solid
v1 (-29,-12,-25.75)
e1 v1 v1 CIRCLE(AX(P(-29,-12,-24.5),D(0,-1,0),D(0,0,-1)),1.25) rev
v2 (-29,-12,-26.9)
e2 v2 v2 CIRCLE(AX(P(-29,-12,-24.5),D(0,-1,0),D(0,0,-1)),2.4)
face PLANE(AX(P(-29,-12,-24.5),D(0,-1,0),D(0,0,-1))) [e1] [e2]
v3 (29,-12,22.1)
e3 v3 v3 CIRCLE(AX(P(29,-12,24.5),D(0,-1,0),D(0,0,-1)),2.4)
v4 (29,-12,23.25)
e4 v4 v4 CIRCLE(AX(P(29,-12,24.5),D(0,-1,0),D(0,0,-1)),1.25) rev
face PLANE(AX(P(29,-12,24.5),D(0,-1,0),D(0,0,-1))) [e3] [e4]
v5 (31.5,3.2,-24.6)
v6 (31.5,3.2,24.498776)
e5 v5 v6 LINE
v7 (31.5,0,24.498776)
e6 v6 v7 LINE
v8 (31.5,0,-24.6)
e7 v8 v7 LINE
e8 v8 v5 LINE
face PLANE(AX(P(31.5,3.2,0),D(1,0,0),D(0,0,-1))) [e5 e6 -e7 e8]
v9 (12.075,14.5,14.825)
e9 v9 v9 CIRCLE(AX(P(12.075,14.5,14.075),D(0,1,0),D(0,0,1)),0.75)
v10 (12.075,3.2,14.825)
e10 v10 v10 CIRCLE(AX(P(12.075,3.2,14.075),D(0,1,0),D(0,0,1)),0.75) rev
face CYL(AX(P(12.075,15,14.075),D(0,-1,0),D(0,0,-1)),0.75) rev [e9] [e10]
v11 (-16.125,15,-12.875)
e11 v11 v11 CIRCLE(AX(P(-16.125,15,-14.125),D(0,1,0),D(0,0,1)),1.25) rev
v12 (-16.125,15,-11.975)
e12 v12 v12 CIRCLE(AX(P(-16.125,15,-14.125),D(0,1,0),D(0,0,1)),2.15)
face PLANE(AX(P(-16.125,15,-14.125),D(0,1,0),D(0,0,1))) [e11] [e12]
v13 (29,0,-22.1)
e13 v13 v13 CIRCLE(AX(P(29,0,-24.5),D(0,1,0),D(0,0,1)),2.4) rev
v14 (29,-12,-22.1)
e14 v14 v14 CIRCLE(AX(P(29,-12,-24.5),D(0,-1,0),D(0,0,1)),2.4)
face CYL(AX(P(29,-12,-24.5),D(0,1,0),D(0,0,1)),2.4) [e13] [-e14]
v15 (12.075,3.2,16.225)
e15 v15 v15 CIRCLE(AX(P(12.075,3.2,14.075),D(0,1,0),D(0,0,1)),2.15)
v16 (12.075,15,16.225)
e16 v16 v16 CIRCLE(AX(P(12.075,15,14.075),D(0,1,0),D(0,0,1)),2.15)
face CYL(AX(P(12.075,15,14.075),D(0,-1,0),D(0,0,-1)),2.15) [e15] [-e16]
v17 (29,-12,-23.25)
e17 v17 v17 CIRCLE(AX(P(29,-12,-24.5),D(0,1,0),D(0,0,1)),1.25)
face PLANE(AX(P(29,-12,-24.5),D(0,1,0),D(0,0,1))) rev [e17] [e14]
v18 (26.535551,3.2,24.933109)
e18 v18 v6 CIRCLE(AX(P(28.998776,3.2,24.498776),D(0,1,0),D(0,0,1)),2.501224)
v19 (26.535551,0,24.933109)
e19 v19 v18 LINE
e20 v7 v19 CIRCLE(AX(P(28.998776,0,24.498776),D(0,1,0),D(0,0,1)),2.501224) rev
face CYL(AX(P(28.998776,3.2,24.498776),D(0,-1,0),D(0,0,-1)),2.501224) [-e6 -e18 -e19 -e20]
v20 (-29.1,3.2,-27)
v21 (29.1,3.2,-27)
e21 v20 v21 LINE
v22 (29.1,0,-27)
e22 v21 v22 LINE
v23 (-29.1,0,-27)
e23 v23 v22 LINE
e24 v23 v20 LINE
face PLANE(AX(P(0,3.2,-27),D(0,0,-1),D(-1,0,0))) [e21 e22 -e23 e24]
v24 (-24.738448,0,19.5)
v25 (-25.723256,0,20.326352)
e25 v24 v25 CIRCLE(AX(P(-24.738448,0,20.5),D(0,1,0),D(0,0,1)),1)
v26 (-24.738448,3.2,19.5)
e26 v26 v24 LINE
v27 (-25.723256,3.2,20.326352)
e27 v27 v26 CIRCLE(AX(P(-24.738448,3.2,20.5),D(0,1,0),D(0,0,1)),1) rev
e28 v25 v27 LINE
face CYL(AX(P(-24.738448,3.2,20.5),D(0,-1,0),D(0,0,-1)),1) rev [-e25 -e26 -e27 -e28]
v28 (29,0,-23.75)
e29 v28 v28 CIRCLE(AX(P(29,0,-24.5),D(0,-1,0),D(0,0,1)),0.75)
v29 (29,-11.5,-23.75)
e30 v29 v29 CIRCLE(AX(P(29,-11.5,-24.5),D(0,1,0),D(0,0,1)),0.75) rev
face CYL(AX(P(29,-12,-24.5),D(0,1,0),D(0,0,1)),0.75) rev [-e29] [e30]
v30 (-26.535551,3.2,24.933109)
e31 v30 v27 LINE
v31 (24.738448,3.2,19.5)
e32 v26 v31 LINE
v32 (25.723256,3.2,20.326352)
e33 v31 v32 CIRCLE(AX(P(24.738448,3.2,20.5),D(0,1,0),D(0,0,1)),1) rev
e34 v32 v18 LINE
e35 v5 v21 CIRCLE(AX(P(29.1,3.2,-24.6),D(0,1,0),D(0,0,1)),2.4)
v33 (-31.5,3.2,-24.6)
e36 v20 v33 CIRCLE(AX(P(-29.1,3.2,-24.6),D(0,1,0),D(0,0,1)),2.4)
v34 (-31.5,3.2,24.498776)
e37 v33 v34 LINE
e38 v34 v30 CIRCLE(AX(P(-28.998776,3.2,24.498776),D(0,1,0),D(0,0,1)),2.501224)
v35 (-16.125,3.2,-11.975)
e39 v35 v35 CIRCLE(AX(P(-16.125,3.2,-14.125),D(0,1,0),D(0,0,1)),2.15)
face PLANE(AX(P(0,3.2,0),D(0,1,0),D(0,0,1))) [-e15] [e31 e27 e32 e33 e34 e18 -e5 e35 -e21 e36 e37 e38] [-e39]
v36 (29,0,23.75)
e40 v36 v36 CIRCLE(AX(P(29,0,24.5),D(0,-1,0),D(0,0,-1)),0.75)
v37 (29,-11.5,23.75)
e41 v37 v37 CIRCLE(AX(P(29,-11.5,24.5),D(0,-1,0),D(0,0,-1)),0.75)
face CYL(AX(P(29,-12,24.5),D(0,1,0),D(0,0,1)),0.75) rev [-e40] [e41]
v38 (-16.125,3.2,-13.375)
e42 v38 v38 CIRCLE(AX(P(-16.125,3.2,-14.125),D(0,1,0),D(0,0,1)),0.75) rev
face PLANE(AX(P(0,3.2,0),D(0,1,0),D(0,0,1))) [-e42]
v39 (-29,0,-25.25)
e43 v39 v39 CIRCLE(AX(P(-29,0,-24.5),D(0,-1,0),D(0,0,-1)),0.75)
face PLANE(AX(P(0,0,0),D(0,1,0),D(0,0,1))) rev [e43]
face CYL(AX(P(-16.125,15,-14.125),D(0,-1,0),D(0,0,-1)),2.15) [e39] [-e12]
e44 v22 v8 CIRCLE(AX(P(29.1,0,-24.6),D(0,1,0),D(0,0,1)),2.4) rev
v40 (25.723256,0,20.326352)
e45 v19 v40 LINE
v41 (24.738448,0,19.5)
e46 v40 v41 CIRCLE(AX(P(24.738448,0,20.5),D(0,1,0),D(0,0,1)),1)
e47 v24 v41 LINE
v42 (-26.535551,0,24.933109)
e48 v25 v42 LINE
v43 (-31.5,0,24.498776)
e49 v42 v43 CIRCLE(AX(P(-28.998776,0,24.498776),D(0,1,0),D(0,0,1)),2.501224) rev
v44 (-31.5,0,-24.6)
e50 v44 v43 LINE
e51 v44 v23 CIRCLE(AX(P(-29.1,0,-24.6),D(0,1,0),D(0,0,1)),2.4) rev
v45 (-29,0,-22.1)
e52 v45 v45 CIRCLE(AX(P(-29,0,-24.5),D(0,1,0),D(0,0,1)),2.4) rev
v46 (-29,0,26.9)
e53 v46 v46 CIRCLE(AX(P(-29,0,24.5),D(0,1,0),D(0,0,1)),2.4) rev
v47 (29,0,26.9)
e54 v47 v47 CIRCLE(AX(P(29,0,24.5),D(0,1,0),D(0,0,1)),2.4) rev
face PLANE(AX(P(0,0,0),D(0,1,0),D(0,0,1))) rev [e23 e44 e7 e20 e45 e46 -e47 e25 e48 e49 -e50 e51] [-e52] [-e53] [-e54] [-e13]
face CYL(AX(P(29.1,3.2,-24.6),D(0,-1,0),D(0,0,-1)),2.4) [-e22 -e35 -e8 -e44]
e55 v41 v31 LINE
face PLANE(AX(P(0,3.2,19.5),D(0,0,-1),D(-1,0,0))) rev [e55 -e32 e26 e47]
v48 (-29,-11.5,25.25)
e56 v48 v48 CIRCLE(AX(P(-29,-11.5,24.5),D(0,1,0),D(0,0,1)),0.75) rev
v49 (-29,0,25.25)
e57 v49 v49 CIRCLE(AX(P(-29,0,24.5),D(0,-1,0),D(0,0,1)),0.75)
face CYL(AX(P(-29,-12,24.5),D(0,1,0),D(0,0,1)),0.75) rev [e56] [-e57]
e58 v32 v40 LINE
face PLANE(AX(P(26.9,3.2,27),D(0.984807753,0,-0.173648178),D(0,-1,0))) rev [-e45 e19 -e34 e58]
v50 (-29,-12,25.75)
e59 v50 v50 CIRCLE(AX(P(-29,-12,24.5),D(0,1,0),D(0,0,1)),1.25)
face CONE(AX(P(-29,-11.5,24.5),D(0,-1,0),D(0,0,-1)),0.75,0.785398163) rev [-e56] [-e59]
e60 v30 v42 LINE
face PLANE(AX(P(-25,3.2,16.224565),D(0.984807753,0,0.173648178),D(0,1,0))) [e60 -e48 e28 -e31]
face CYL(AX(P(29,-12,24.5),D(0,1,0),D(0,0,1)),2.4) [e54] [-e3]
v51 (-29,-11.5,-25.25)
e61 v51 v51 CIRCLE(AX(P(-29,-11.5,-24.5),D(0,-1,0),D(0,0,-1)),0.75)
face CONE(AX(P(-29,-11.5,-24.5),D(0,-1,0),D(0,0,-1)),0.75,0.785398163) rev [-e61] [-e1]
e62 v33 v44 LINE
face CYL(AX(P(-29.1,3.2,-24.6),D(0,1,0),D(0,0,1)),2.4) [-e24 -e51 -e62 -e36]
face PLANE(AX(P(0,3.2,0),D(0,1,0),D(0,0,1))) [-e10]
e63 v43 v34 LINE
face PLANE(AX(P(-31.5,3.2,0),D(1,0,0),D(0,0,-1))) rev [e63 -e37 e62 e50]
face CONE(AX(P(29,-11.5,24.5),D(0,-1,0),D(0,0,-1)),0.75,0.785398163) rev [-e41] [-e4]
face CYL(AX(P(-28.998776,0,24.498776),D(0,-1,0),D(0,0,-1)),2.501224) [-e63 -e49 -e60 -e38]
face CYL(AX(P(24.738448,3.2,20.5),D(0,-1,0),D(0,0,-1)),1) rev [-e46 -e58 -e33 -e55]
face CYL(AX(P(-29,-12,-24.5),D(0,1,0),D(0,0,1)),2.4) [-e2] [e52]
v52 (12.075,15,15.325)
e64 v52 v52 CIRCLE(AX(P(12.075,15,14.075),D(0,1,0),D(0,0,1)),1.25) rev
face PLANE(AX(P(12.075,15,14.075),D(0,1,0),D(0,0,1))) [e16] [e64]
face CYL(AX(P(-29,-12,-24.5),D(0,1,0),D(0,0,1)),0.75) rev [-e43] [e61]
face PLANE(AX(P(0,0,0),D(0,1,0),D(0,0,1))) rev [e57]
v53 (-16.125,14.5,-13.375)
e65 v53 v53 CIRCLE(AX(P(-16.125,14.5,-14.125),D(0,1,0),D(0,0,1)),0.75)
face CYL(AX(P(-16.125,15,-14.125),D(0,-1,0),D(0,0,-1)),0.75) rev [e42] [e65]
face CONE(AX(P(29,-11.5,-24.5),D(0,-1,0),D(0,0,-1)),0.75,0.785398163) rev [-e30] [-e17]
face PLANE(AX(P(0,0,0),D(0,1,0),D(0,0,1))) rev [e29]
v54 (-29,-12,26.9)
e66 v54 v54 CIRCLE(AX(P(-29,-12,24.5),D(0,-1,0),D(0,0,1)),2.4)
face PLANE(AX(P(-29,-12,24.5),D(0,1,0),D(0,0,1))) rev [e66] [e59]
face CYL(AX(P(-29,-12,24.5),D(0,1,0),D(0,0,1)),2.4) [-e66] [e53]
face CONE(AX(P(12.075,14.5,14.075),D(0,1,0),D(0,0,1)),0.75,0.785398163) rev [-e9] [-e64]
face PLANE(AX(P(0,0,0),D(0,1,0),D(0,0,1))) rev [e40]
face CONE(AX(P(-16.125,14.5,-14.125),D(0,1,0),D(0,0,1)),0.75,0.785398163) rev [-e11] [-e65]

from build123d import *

# Parameters (mm, degrees)
BOSS_EXTRUDE1_DEPTH = 3.2
SKETCH2_R           = 2.4
SKETCH2_R_2         = 0.75
BOSS_EXTRUDE2_DEPTH = 12
SKETCH3_R           = 2.15
SKETCH3_R_2         = 0.75
BOSS_EXTRUDE3_DEPTH = 11.8
CHAMFER1_SIZE       = 0.5
CHAMFER2_SIZE       = 1.9
CHAMFER2_SIZE_2     = 10.775435457
FILLET1_R           = 2.4
FILLET2_R           = 2.501224
FILLET3_R           = 2.501224
FILLET4_R           = 1


# Some blends are built 0.0001 mm under size
with BuildPart() as part:
    # Sketch1 → Boss-Extrude1 (new body)
    with BuildSketch(Plane(origin=(0, 0, 0), x_dir=(1, 0, 0), z_dir=(0, 1, 0))):
        Polygon((31.5, 27), (-31.5, 27), (-31.5, -27), (-25, -27), (-25, -19.5), (25, -19.5), (25, -27), (31.5, -27), align=None)
    extrude(amount=BOSS_EXTRUDE1_DEPTH)

    # Sketch2 → Boss-Extrude2 (add)
    # profile 1 of 4: a face of its own
    with BuildSketch(Plane.XZ):
        with Locations(Location((-29, -24.5, 0), (0, 0, 90))):
            Circle(SKETCH2_R)
        with Locations(Location((-29, -24.5, 0), (0, 0, 270))):
            Circle(SKETCH2_R_2, mode=Mode.SUBTRACT)
    # profile 2 of 4: a face of its own
    with BuildSketch(Plane.XZ):
        with Locations(Location((29, -24.5, 0), (0, 0, 90))):
            Circle(SKETCH2_R)
        with Locations(Location((29, -24.5, 0), (0, 0, 90))):
            Circle(SKETCH2_R_2, mode=Mode.SUBTRACT)
    # profile 3 of 4: a face of its own
    with BuildSketch(Plane.XZ):
        with Locations(Location((29, 24.5, 0), (0, 0, 90))):
            Circle(SKETCH2_R)
        with Locations(Location((29, 24.5, 0), (0, 0, 270))):
            Circle(SKETCH2_R_2, mode=Mode.SUBTRACT)
    # profile 4 of 4: a face of its own
    with BuildSketch(Plane.XZ):
        with Locations(Location((-29, 24.5, 0), (0, 0, 90))):
            Circle(SKETCH2_R)
        with Locations(Location((-29, 24.5, 0), (0, 0, 90))):
            Circle(SKETCH2_R_2, mode=Mode.SUBTRACT)
    extrude(amount=BOSS_EXTRUDE2_DEPTH)

    # Sketch3 → Boss-Extrude3 (add)
    # profile 1 of 2: a face of its own
    with BuildSketch(Plane(origin=(0, 3.2, 0), x_dir=(1, 0, 0), z_dir=(0, 1, 0))):
        with Locations(Location((-16.125, 14.125, 0), (0, 0, 270))):
            Circle(SKETCH3_R)
        with Locations(Location((-16.125, 14.125, 0), (0, 0, 270))):
            Circle(SKETCH3_R_2, mode=Mode.SUBTRACT)
    # profile 2 of 2: a face of its own
    with BuildSketch(Plane(origin=(0, 3.2, 0), x_dir=(1, 0, 0), z_dir=(0, 1, 0))):
        with Locations(Location((12.075, -14.075, 0), (0, 0, 270))):
            Circle(SKETCH3_R)
        with Locations(Location((12.075, -14.075, 0), (0, 0, 270))):
            Circle(SKETCH3_R_2, mode=Mode.SUBTRACT)
    extrude(amount=BOSS_EXTRUDE3_DEPTH)

    # Chamfer1
    chamfer1_edges = [part.edges().sort_by_distance(p)[0] for p in [
        (-29, -12, -23.75),
        (29, -12, -25.25),
        (29, -12, 25.25),
        (-29, -12, 23.75),
        (-16.125, 15, -14.875),
        (12.075, 15, 13.325),
    ]]
    chamfer(chamfer1_edges, length=CHAMFER1_SIZE)

    # Chamfer2
    # the kernel refuses this chamfer: 10.775435457, 1.9 mm, written as the material it takes off along each edge
    with BuildSketch(Plane(origin=(25, -28.000387084, 27), x_dir=(0.9776715712462577, 0, 0.2101387607674357), z_dir=(0, 1, 0))) as chamfer2_piece_1_section:
        Polygon((CHAMFER2_SIZE * 0.977671571246, CHAMFER2_SIZE * 0.210138760767), (-CHAMFER2_SIZE_2 * 0.210138760773, CHAMFER2_SIZE_2 * 0.977671571271), (0, 0), align=None)
    chamfer2_piece_1 = extrude(amount=59.200774168, mode=Mode.PRIVATE)
    chamfer2_piece_1 = split(chamfer2_piece_1, bisect_by=Plane(origin=(25.592384699, 1.6, 19.5), z_dir=(0, 0, 1)), keep=Keep.TOP, mode=Mode.PRIVATE)
    add(chamfer2_piece_1, mode=Mode.SUBTRACT)
    with BuildSketch(Plane(origin=(-25, -28.000387084, 27), x_dir=(0.006682531656101439, 0, -0.9999776716360547), z_dir=(0, 1, 0))) as chamfer2_piece_2_section:
        Polygon((CHAMFER2_SIZE_2 * 0.999977671661, CHAMFER2_SIZE_2 * 0.00668253165627), (-CHAMFER2_SIZE * 0.0066825316561, CHAMFER2_SIZE * 0.999977671636), (0, 0), align=None)
    chamfer2_piece_2 = extrude(amount=59.200774168, mode=Mode.PRIVATE)
    chamfer2_piece_2 = split(chamfer2_piece_2, bisect_by=Plane(origin=(-25.592384699, 1.6, 19.5), z_dir=(0, 0, 1)), keep=Keep.TOP, mode=Mode.PRIVATE)
    add(chamfer2_piece_2, mode=Mode.SUBTRACT)

    # Fillet1
    fillet1_edges = [part.edges().sort_by_distance(p)[0] for p in [
        (-31.5, 1.6, -27),
        (31.5, 1.6, -27),
    ]]
    fillet(fillet1_edges, radius=FILLET1_R)

    # Fillet2
    fillet2_edges = [part.edges().sort_by_distance(p)[0] for p in [
        (31.5, 1.6, 27),
        (26.9, 1.6, 27),
    ]]
    fillet(fillet2_edges, radius=FILLET2_R - 0.0001)  # a hair under: the kernel refuses the full size

    # Fillet3
    fillet3_edges = [part.edges().sort_by_distance(p)[0] for p in [
        (-31.5, 1.6, 27),
        (-26.9, 1.6, 27),
    ]]
    fillet(fillet3_edges, radius=FILLET3_R - 0.0001)  # a hair under: the kernel refuses the full size

    # Fillet4
    fillet4_edges = [part.edges().sort_by_distance(p)[0] for p in [
        (25.577547645, 1.6, 19.5),
        (-25.577547645, 1.6, 19.5),
    ]]
    fillet(fillet4_edges, radius=FILLET4_R)


solid = part.part
